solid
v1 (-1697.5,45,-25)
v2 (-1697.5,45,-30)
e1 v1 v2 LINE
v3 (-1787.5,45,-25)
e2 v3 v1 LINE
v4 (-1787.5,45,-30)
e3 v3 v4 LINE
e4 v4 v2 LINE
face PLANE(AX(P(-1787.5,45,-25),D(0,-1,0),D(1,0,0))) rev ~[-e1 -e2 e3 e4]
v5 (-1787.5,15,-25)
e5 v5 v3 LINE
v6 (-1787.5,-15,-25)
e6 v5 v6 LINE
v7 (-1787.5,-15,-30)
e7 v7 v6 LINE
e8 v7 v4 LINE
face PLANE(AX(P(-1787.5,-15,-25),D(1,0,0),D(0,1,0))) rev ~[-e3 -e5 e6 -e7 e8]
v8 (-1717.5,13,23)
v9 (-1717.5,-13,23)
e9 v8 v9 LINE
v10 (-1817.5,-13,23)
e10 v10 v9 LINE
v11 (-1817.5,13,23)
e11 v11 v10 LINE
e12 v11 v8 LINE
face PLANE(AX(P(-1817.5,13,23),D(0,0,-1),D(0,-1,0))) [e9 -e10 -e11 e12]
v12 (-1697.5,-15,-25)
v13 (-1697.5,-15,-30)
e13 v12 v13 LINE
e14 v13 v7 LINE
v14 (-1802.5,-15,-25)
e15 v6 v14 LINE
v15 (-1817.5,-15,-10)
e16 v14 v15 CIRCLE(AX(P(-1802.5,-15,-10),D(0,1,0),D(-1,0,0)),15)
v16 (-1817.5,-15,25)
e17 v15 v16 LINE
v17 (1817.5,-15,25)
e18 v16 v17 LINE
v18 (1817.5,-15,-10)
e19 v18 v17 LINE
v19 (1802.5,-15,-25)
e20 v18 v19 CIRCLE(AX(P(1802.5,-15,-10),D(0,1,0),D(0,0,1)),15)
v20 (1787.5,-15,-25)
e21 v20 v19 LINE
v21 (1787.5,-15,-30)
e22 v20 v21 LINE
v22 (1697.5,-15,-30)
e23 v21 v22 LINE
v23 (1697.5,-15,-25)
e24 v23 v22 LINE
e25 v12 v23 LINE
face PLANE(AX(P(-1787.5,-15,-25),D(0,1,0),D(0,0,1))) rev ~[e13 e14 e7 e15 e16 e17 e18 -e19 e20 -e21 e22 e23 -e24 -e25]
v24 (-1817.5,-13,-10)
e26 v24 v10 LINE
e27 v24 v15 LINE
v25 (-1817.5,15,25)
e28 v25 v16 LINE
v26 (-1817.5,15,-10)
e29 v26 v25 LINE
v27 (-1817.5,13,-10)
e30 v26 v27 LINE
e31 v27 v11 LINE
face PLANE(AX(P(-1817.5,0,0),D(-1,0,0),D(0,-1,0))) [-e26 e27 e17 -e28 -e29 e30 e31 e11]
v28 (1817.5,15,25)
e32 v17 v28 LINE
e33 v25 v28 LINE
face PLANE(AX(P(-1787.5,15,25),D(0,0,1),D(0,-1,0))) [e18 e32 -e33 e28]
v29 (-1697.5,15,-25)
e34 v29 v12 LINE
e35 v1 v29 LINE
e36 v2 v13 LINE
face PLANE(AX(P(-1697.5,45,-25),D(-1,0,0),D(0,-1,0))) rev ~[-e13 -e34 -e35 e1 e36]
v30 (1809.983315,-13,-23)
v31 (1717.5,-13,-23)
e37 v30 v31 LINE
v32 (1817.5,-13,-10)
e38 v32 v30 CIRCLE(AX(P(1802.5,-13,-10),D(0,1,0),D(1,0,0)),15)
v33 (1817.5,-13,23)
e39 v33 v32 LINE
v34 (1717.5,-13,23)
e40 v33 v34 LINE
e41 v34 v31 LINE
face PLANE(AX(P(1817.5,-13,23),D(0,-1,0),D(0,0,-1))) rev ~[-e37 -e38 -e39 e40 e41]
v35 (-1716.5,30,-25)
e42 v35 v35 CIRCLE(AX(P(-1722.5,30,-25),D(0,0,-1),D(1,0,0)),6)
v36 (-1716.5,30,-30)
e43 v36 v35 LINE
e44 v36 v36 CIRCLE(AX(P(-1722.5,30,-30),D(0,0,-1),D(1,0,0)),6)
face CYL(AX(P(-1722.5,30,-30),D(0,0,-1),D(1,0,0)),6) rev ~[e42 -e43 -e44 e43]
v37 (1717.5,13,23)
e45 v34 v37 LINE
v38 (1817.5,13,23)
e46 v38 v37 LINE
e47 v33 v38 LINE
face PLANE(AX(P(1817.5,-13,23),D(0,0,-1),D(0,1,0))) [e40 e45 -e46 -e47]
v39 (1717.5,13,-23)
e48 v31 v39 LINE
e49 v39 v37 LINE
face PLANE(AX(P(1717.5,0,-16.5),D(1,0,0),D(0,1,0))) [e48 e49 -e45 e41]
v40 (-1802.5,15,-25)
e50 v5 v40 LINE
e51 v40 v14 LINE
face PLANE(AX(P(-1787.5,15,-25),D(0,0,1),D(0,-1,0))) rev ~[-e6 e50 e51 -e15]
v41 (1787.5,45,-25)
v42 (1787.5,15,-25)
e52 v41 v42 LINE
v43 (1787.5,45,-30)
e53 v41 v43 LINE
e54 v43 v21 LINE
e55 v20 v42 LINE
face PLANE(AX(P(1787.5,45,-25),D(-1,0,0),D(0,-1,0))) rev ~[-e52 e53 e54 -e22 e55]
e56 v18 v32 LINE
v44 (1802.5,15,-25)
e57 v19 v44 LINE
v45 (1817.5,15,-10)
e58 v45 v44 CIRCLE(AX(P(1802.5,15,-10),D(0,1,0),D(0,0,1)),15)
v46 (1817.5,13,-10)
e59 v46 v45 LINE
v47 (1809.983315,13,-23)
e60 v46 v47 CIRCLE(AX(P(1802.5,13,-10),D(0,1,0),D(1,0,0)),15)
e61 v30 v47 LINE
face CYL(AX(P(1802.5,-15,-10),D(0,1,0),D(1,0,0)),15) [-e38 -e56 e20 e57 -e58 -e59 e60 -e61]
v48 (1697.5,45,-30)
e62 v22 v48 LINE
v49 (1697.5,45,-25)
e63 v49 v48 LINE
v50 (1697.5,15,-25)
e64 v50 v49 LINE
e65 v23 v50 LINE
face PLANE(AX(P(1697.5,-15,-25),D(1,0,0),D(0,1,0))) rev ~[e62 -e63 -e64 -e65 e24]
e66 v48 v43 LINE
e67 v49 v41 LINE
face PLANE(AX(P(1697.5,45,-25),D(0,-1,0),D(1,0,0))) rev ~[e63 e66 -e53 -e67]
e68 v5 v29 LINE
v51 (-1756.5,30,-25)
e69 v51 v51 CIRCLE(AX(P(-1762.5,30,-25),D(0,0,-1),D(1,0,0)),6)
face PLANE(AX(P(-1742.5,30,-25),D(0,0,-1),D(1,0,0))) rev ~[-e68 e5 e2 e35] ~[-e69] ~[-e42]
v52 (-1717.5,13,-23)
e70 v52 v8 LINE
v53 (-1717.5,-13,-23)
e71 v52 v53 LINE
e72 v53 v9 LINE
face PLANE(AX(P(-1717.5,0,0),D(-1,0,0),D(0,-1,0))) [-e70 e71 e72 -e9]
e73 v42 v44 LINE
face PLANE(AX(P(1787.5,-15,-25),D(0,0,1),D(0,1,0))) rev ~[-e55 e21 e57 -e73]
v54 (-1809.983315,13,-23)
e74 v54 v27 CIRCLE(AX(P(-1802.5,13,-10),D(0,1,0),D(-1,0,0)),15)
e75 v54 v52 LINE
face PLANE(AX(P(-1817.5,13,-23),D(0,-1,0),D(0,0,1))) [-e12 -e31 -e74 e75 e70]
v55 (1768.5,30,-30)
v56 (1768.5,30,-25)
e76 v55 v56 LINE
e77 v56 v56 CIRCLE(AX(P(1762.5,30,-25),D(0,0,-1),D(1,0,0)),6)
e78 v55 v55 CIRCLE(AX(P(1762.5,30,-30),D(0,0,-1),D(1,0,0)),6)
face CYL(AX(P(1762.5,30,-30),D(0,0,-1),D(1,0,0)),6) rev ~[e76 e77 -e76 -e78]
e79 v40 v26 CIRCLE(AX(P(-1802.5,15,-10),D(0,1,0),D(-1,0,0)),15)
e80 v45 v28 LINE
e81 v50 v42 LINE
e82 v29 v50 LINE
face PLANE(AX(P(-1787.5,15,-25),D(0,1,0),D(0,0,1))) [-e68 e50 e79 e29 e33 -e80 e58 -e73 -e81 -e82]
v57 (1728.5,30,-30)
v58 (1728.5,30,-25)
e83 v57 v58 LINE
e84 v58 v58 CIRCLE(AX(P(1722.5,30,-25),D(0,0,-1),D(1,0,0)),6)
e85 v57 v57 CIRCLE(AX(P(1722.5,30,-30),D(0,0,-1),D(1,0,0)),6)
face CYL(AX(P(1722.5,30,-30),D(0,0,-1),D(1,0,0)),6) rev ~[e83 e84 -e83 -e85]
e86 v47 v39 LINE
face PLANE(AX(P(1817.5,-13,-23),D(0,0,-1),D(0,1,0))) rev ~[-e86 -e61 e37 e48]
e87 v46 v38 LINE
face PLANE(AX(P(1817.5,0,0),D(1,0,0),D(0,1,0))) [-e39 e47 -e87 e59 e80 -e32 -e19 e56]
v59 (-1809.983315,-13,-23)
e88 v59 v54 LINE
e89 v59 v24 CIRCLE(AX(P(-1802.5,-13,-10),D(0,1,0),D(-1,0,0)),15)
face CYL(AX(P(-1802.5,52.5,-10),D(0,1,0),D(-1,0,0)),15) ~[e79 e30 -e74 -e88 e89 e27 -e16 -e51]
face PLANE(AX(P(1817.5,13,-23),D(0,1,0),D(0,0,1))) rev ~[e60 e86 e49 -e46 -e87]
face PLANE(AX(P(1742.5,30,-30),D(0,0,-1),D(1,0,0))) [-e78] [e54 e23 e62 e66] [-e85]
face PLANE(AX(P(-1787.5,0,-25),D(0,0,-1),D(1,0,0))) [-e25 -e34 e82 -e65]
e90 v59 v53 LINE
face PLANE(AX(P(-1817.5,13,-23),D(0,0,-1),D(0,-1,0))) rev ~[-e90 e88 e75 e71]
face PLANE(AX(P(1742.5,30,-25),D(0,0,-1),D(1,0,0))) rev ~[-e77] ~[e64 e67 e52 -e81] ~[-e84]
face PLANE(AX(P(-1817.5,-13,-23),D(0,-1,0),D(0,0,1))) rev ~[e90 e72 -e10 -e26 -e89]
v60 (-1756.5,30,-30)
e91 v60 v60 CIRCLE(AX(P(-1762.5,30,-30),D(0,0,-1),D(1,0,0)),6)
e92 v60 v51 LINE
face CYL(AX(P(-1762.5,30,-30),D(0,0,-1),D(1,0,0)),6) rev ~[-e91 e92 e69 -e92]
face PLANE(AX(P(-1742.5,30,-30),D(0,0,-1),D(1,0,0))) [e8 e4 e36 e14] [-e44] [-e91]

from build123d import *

# Parameters (mm, degrees)
F0_W          = 3575
F0_H          = 50
F1_DEPTH      = 15
F1_DEPTH_BACK = 15
F2_W          = 90
F2_H          = 30
F3_DEPTH      = 5
F4_W          = 90
F4_H          = 30
F5_DEPTH      = 5
F6_R          = 6
F7_DEPTH      = 25
F8_R          = 6
F9_DEPTH      = 5
F10_R         = 6
F11_DEPTH     = 5
F12_W         = 30
F12_H         = 50
F13_DEPTH     = 30
F14_R         = 15
F15_W         = 26
F15_H         = 13
F15_H_2       = 33
F16_DEPTH     = 100
F17_W         = 30
F17_H         = 50
F18_DEPTH     = 30
F19_W         = 26
F19_H         = 46
F20_DEPTH     = 100
F21_T1_DEPTH  = 105


# Not quite as in the source:
# - a fillet or chamfer that OpenCascade refuses, or shapes differently, is made with other operations: its cross-section is extruded or revolved along the edge and cut away or added


with BuildPart() as f1:
    # F0 (on Front) → F1 (new body, two sides)
    with BuildSketch(Plane.XZ) as f1_sk:
        Rectangle(F0_W, F0_H)
    extrude(amount=F1_DEPTH)
    extrude(f1_sk.sketch, amount=-F1_DEPTH_BACK)

    # F2 (on face) → F3 (join)
    with BuildSketch(Plane(origin=(0, 0, -25), x_dir=(1, 0, 0), z_dir=(0, 0, -1))):
        with Locations((-1742.5, -30)):
            Rectangle(F2_W, F2_H)
        Polygon((-1697.5, 15), (-1787.5, 15), (-1787.5, 0), (-1787.5, -15), (-1697.5, -15), align=None)
    extrude(amount=F3_DEPTH)

    # F4 (on face) → F5 (join)
    with BuildSketch(Plane(origin=(0, 0, -25), x_dir=(1, 0, 0), z_dir=(0, 0, -1))):
        with Locations((1742.5, -30)):
            Rectangle(F4_W, F4_H)
        Polygon((1787.5, 0), (1787.5, 15), (1697.5, 15), (1697.5, -15), (1787.5, -15), align=None)
    extrude(amount=F5_DEPTH)

    # F6 (on face) → F7 (cut, through all)
    with BuildSketch(Plane.XY):
        with Locations((-935, 30)):
            Circle(F6_R)
        with Locations((-975, 30)):
            Circle(F6_R)
    extrude(amount=-F7_DEPTH, mode=Mode.SUBTRACT)

    # F8 (on face) → F9 (cut, through all)
    with BuildSketch(Plane(origin=(0, 0, -30), x_dir=(1, 0, 0), z_dir=(0, 0, -1))):
        with Locations((1762.5, -30)):
            Circle(F8_R)
        with Locations((1722.5, -30)):
            Circle(F8_R)
    extrude(amount=-F9_DEPTH, mode=Mode.SUBTRACT)

    # F10 (on face) → F11 (cut, through all)
    with BuildSketch(Plane(origin=(0, 0, -30), x_dir=(1, 0, 0), z_dir=(0, 0, -1))):
        with Locations((-1722.5, -30)):
            Circle(F10_R)
        with Locations((-1762.5, -30)):
            Circle(F10_R)
    extrude(amount=-F11_DEPTH, mode=Mode.SUBTRACT)

    # F12 (on face) → F13 (join)
    with BuildSketch(Plane.YZ.offset(1787.5)):
        Rectangle(F12_W, F12_H)
    extrude(amount=F13_DEPTH)

    # F14
    f14_edges = [f1.edges().sort_by_distance(p)[0] for p in [
        (1817.5, 0, -25),
    ]]
    fillet(f14_edges, radius=F14_R)

    # F15 (on face) → F16 (cut)
    with BuildSketch(Plane.YZ.offset(1817.5)):
        with Locations((0, -16.5)):
            Rectangle(F15_W, F15_H)
        with Locations((0, 6.5)):
            Rectangle(F15_W, F15_H_2)
    extrude(amount=-F16_DEPTH, mode=Mode.SUBTRACT)

    # F17 (on face) → F18 (join)
    with BuildSketch(Plane(origin=(-1787.5, 0, 0), x_dir=(0, -1, 0), z_dir=(-1, 0, 0))):
        Rectangle(F17_W, F17_H)
    extrude(amount=F18_DEPTH)

    # F19 (on face) → F20 (cut)
    with BuildSketch(Plane(origin=(-1817.5, 0, 0), x_dir=(0, -1, 0), z_dir=(-1, 0, 0))):
        Rectangle(F19_W, F19_H)
    extrude(amount=-F20_DEPTH, mode=Mode.SUBTRACT)

    # F21: fillet of radius 15 on 1 edges, made by hand

    # F21_s2 → F21_t1 (cut)
    with BuildSketch(Plane.XZ.offset(-52.5)):
        with BuildLine():
            ThreePointArc((-1817.5, -10), (-1813.1066017178, -20.6066017178), (-1802.5, -25))
            Line((-1802.5, -25), (-1817.5, -25))
            Line((-1817.5, -25), (-1817.5, -10))
        make_face()
    extrude(amount=F21_T1_DEPTH, mode=Mode.SUBTRACT)


solid = f1.part
